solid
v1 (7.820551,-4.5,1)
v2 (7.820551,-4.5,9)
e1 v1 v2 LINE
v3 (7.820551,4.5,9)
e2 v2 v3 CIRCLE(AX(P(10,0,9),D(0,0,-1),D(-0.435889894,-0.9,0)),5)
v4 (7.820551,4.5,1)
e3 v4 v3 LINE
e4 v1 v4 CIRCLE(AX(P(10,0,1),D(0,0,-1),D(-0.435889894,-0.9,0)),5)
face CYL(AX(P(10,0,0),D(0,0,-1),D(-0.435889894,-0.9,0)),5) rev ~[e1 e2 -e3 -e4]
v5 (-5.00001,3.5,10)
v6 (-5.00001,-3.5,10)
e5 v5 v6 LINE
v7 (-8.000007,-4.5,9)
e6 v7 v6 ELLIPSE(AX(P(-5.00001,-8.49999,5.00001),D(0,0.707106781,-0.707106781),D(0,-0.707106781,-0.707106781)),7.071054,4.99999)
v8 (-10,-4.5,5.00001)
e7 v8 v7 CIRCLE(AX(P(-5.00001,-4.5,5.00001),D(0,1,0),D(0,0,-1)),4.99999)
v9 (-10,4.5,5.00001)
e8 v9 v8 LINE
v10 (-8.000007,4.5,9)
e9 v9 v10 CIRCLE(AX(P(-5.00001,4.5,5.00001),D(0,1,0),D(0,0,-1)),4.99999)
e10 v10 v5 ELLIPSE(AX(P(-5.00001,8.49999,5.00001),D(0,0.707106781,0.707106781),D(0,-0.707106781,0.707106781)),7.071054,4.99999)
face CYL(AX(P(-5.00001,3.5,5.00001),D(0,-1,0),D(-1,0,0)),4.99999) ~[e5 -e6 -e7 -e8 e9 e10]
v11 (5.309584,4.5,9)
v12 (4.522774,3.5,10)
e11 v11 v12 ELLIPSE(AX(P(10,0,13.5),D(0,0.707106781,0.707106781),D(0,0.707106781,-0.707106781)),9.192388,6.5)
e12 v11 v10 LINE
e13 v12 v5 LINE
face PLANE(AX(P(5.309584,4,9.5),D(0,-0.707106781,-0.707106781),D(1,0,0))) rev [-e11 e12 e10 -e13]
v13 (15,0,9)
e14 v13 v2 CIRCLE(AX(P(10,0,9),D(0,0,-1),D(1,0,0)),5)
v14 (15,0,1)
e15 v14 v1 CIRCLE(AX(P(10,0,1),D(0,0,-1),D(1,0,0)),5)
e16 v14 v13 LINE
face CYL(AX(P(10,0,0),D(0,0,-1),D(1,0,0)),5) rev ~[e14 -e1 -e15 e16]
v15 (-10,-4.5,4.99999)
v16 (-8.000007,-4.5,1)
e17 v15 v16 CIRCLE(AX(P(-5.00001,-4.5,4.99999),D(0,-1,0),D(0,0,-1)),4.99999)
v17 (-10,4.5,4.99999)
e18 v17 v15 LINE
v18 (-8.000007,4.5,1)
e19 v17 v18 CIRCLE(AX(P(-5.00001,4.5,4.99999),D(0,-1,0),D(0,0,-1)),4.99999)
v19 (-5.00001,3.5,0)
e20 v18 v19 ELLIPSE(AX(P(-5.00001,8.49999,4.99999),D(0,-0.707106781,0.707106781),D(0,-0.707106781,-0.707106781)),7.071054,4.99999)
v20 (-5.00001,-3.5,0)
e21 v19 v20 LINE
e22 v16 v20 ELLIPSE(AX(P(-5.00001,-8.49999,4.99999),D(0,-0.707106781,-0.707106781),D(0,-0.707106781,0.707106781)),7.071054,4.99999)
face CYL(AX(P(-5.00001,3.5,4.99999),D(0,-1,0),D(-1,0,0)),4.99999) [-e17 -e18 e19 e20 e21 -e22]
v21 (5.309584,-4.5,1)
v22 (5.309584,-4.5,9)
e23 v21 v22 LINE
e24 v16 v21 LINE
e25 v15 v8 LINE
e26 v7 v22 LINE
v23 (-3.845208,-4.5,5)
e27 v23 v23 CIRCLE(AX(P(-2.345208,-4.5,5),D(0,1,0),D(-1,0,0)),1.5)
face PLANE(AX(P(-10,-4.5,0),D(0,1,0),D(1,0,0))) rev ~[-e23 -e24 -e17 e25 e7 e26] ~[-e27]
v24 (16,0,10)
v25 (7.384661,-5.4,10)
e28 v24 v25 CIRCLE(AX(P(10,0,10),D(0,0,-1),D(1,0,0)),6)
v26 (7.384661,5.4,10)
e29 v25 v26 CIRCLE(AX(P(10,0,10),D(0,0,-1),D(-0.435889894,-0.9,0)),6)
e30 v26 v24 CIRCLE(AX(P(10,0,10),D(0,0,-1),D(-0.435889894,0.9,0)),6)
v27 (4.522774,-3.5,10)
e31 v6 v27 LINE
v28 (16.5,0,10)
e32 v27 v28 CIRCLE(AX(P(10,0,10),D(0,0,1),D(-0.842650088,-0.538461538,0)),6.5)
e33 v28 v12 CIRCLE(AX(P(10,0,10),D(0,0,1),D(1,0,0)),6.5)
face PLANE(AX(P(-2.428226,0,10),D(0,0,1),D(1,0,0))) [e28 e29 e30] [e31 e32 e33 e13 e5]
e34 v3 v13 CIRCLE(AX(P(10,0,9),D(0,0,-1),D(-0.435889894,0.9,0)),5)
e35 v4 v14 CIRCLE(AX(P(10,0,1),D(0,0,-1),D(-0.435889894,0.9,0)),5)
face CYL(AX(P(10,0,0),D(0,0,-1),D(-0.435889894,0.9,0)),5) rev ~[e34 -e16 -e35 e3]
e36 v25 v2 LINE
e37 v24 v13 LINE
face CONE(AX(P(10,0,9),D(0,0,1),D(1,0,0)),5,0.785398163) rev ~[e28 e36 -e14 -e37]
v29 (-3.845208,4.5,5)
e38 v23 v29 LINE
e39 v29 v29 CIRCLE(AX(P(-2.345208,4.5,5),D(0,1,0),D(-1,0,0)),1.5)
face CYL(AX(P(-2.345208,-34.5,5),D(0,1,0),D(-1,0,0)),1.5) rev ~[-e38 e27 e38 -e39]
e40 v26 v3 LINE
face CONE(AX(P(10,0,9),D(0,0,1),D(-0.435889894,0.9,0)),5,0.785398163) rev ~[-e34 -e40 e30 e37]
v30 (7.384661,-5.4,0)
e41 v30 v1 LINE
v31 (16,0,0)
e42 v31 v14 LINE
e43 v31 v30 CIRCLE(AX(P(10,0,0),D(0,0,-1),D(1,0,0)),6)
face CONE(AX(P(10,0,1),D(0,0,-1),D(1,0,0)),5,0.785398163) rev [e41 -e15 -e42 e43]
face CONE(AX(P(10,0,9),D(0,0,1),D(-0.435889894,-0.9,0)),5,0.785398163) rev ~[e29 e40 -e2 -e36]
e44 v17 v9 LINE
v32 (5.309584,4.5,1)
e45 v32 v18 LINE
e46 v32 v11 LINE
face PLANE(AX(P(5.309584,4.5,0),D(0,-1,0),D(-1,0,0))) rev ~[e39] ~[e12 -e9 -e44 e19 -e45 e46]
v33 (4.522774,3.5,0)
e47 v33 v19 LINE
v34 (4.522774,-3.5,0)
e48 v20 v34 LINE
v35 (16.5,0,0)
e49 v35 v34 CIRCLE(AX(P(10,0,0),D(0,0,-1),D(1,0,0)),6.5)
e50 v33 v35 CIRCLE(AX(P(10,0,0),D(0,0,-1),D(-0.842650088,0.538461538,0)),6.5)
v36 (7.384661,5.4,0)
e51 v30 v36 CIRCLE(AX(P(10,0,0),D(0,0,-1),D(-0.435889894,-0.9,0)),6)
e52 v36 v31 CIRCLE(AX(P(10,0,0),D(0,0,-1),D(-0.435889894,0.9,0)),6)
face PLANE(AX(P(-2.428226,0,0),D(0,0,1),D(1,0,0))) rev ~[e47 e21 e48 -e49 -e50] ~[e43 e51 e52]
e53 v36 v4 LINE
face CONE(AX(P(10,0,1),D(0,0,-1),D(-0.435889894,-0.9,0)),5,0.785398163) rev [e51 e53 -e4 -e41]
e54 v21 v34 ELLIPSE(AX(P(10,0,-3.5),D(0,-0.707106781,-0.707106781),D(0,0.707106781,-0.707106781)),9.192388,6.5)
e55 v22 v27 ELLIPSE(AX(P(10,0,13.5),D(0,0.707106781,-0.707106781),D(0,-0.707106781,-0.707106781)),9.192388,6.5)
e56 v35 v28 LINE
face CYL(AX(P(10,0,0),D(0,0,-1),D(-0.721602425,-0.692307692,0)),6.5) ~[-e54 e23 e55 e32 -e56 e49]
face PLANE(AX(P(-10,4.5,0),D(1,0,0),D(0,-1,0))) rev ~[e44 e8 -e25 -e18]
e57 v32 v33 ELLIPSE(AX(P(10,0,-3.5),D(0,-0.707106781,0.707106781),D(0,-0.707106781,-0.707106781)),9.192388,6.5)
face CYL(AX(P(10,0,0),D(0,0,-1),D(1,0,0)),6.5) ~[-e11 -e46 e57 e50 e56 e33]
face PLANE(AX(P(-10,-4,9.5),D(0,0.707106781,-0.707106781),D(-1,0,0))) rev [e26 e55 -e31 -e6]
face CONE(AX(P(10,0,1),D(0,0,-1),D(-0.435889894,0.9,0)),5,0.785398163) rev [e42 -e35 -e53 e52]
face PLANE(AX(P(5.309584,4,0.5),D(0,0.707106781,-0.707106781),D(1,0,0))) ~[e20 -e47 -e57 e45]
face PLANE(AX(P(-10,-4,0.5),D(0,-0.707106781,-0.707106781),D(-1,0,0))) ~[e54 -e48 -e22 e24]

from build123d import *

# Parameters (mm, degrees)
F1_DEPTH = 10
F3_D     = 3
F3_DEPTH = 30
F3_TIP   = 0.9012909285
F4_SIZE  = 1
F5_R     = 4.99999


# Not quite as in the source:
# - a fillet or chamfer is up to 0.001 mm smaller than in the source, because OpenCascade refuses the exact size


with BuildPart() as f1:
    # F0 (on Top) → F1 (new body)
    with BuildSketch(Plane.XY):
        with BuildLine():
            Line((5.3095842402, 4.5), (-10, 4.5))
            Line((-10, 4.5), (-10, -4.5))
            Line((-10, -4.5), (5.3095842402, -4.5))
            ThreePointArc((5.3095842402, -4.5), (3.5, 0), (5.3095842402, 4.5))
        make_face()
        with BuildLine():
            Line((7.8205505282, 4.5), (5.3095842402, 4.5))
            ThreePointArc((5.3095842402, 4.5), (3.5, 0), (5.3095842402, -4.5))
            Line((5.3095842402, -4.5), (7.8205505282, -4.5))
            ThreePointArc((7.8205505282, -4.5), (5, 0), (7.8205505282, 4.5))
        make_face()
        with BuildLine():
            ThreePointArc((16.5, 0), (12.4251079936, 6.0306592691), (5.3095842402, 4.5))
            Line((5.3095842402, 4.5), (7.8205505282, 4.5))
            ThreePointArc((7.8205505282, 4.5), (12.655442773, 4.2365816031), (15, 0))
            ThreePointArc((15, 0), (12.655442773, -4.2365816031), (7.8205505282, -4.5))
            Line((7.8205505282, -4.5), (5.3095842402, -4.5))
            ThreePointArc((5.3095842402, -4.5), (12.4251079936, -6.0306592691), (16.5, 0))
        make_face()
    extrude(amount=F1_DEPTH)

    # F3
    with Locations(Plane.XZ.offset(4.5)):
        with Locations((-2.3452078799, 5)):
            Hole(F3_D / 2, depth=F3_DEPTH)
            with Locations((0, 0, -(F3_DEPTH + F3_TIP / 2))):  # 118° drill point
                Cone(0, F3_D / 2, F3_TIP, mode=Mode.SUBTRACT)

    # F4
    f4_edges = [f1.edges().sort_by_distance(p)[0] for p in [
        (12.179449, -4.5, 10),
        (12.179449, -4.5, 0),
        (-2.345208, 4.5, 10),
        (-2.345208, -4.5, 10),
        (-2.345208, -4.5, 0),
        (-2.345208, 4.5, 0),
    ]]
    chamfer(f4_edges, length=F4_SIZE)

    # F5 (radius 5 in the source; OpenCascade refuses exactly that, so slightly less here)
    f5_edges = [f1.edges().sort_by_distance(p)[0] for p in [
        (-10, 0, 10),
        (-10, 0, 0),
    ]]
    fillet(f5_edges, radius=F5_R)


solid = f1.part
